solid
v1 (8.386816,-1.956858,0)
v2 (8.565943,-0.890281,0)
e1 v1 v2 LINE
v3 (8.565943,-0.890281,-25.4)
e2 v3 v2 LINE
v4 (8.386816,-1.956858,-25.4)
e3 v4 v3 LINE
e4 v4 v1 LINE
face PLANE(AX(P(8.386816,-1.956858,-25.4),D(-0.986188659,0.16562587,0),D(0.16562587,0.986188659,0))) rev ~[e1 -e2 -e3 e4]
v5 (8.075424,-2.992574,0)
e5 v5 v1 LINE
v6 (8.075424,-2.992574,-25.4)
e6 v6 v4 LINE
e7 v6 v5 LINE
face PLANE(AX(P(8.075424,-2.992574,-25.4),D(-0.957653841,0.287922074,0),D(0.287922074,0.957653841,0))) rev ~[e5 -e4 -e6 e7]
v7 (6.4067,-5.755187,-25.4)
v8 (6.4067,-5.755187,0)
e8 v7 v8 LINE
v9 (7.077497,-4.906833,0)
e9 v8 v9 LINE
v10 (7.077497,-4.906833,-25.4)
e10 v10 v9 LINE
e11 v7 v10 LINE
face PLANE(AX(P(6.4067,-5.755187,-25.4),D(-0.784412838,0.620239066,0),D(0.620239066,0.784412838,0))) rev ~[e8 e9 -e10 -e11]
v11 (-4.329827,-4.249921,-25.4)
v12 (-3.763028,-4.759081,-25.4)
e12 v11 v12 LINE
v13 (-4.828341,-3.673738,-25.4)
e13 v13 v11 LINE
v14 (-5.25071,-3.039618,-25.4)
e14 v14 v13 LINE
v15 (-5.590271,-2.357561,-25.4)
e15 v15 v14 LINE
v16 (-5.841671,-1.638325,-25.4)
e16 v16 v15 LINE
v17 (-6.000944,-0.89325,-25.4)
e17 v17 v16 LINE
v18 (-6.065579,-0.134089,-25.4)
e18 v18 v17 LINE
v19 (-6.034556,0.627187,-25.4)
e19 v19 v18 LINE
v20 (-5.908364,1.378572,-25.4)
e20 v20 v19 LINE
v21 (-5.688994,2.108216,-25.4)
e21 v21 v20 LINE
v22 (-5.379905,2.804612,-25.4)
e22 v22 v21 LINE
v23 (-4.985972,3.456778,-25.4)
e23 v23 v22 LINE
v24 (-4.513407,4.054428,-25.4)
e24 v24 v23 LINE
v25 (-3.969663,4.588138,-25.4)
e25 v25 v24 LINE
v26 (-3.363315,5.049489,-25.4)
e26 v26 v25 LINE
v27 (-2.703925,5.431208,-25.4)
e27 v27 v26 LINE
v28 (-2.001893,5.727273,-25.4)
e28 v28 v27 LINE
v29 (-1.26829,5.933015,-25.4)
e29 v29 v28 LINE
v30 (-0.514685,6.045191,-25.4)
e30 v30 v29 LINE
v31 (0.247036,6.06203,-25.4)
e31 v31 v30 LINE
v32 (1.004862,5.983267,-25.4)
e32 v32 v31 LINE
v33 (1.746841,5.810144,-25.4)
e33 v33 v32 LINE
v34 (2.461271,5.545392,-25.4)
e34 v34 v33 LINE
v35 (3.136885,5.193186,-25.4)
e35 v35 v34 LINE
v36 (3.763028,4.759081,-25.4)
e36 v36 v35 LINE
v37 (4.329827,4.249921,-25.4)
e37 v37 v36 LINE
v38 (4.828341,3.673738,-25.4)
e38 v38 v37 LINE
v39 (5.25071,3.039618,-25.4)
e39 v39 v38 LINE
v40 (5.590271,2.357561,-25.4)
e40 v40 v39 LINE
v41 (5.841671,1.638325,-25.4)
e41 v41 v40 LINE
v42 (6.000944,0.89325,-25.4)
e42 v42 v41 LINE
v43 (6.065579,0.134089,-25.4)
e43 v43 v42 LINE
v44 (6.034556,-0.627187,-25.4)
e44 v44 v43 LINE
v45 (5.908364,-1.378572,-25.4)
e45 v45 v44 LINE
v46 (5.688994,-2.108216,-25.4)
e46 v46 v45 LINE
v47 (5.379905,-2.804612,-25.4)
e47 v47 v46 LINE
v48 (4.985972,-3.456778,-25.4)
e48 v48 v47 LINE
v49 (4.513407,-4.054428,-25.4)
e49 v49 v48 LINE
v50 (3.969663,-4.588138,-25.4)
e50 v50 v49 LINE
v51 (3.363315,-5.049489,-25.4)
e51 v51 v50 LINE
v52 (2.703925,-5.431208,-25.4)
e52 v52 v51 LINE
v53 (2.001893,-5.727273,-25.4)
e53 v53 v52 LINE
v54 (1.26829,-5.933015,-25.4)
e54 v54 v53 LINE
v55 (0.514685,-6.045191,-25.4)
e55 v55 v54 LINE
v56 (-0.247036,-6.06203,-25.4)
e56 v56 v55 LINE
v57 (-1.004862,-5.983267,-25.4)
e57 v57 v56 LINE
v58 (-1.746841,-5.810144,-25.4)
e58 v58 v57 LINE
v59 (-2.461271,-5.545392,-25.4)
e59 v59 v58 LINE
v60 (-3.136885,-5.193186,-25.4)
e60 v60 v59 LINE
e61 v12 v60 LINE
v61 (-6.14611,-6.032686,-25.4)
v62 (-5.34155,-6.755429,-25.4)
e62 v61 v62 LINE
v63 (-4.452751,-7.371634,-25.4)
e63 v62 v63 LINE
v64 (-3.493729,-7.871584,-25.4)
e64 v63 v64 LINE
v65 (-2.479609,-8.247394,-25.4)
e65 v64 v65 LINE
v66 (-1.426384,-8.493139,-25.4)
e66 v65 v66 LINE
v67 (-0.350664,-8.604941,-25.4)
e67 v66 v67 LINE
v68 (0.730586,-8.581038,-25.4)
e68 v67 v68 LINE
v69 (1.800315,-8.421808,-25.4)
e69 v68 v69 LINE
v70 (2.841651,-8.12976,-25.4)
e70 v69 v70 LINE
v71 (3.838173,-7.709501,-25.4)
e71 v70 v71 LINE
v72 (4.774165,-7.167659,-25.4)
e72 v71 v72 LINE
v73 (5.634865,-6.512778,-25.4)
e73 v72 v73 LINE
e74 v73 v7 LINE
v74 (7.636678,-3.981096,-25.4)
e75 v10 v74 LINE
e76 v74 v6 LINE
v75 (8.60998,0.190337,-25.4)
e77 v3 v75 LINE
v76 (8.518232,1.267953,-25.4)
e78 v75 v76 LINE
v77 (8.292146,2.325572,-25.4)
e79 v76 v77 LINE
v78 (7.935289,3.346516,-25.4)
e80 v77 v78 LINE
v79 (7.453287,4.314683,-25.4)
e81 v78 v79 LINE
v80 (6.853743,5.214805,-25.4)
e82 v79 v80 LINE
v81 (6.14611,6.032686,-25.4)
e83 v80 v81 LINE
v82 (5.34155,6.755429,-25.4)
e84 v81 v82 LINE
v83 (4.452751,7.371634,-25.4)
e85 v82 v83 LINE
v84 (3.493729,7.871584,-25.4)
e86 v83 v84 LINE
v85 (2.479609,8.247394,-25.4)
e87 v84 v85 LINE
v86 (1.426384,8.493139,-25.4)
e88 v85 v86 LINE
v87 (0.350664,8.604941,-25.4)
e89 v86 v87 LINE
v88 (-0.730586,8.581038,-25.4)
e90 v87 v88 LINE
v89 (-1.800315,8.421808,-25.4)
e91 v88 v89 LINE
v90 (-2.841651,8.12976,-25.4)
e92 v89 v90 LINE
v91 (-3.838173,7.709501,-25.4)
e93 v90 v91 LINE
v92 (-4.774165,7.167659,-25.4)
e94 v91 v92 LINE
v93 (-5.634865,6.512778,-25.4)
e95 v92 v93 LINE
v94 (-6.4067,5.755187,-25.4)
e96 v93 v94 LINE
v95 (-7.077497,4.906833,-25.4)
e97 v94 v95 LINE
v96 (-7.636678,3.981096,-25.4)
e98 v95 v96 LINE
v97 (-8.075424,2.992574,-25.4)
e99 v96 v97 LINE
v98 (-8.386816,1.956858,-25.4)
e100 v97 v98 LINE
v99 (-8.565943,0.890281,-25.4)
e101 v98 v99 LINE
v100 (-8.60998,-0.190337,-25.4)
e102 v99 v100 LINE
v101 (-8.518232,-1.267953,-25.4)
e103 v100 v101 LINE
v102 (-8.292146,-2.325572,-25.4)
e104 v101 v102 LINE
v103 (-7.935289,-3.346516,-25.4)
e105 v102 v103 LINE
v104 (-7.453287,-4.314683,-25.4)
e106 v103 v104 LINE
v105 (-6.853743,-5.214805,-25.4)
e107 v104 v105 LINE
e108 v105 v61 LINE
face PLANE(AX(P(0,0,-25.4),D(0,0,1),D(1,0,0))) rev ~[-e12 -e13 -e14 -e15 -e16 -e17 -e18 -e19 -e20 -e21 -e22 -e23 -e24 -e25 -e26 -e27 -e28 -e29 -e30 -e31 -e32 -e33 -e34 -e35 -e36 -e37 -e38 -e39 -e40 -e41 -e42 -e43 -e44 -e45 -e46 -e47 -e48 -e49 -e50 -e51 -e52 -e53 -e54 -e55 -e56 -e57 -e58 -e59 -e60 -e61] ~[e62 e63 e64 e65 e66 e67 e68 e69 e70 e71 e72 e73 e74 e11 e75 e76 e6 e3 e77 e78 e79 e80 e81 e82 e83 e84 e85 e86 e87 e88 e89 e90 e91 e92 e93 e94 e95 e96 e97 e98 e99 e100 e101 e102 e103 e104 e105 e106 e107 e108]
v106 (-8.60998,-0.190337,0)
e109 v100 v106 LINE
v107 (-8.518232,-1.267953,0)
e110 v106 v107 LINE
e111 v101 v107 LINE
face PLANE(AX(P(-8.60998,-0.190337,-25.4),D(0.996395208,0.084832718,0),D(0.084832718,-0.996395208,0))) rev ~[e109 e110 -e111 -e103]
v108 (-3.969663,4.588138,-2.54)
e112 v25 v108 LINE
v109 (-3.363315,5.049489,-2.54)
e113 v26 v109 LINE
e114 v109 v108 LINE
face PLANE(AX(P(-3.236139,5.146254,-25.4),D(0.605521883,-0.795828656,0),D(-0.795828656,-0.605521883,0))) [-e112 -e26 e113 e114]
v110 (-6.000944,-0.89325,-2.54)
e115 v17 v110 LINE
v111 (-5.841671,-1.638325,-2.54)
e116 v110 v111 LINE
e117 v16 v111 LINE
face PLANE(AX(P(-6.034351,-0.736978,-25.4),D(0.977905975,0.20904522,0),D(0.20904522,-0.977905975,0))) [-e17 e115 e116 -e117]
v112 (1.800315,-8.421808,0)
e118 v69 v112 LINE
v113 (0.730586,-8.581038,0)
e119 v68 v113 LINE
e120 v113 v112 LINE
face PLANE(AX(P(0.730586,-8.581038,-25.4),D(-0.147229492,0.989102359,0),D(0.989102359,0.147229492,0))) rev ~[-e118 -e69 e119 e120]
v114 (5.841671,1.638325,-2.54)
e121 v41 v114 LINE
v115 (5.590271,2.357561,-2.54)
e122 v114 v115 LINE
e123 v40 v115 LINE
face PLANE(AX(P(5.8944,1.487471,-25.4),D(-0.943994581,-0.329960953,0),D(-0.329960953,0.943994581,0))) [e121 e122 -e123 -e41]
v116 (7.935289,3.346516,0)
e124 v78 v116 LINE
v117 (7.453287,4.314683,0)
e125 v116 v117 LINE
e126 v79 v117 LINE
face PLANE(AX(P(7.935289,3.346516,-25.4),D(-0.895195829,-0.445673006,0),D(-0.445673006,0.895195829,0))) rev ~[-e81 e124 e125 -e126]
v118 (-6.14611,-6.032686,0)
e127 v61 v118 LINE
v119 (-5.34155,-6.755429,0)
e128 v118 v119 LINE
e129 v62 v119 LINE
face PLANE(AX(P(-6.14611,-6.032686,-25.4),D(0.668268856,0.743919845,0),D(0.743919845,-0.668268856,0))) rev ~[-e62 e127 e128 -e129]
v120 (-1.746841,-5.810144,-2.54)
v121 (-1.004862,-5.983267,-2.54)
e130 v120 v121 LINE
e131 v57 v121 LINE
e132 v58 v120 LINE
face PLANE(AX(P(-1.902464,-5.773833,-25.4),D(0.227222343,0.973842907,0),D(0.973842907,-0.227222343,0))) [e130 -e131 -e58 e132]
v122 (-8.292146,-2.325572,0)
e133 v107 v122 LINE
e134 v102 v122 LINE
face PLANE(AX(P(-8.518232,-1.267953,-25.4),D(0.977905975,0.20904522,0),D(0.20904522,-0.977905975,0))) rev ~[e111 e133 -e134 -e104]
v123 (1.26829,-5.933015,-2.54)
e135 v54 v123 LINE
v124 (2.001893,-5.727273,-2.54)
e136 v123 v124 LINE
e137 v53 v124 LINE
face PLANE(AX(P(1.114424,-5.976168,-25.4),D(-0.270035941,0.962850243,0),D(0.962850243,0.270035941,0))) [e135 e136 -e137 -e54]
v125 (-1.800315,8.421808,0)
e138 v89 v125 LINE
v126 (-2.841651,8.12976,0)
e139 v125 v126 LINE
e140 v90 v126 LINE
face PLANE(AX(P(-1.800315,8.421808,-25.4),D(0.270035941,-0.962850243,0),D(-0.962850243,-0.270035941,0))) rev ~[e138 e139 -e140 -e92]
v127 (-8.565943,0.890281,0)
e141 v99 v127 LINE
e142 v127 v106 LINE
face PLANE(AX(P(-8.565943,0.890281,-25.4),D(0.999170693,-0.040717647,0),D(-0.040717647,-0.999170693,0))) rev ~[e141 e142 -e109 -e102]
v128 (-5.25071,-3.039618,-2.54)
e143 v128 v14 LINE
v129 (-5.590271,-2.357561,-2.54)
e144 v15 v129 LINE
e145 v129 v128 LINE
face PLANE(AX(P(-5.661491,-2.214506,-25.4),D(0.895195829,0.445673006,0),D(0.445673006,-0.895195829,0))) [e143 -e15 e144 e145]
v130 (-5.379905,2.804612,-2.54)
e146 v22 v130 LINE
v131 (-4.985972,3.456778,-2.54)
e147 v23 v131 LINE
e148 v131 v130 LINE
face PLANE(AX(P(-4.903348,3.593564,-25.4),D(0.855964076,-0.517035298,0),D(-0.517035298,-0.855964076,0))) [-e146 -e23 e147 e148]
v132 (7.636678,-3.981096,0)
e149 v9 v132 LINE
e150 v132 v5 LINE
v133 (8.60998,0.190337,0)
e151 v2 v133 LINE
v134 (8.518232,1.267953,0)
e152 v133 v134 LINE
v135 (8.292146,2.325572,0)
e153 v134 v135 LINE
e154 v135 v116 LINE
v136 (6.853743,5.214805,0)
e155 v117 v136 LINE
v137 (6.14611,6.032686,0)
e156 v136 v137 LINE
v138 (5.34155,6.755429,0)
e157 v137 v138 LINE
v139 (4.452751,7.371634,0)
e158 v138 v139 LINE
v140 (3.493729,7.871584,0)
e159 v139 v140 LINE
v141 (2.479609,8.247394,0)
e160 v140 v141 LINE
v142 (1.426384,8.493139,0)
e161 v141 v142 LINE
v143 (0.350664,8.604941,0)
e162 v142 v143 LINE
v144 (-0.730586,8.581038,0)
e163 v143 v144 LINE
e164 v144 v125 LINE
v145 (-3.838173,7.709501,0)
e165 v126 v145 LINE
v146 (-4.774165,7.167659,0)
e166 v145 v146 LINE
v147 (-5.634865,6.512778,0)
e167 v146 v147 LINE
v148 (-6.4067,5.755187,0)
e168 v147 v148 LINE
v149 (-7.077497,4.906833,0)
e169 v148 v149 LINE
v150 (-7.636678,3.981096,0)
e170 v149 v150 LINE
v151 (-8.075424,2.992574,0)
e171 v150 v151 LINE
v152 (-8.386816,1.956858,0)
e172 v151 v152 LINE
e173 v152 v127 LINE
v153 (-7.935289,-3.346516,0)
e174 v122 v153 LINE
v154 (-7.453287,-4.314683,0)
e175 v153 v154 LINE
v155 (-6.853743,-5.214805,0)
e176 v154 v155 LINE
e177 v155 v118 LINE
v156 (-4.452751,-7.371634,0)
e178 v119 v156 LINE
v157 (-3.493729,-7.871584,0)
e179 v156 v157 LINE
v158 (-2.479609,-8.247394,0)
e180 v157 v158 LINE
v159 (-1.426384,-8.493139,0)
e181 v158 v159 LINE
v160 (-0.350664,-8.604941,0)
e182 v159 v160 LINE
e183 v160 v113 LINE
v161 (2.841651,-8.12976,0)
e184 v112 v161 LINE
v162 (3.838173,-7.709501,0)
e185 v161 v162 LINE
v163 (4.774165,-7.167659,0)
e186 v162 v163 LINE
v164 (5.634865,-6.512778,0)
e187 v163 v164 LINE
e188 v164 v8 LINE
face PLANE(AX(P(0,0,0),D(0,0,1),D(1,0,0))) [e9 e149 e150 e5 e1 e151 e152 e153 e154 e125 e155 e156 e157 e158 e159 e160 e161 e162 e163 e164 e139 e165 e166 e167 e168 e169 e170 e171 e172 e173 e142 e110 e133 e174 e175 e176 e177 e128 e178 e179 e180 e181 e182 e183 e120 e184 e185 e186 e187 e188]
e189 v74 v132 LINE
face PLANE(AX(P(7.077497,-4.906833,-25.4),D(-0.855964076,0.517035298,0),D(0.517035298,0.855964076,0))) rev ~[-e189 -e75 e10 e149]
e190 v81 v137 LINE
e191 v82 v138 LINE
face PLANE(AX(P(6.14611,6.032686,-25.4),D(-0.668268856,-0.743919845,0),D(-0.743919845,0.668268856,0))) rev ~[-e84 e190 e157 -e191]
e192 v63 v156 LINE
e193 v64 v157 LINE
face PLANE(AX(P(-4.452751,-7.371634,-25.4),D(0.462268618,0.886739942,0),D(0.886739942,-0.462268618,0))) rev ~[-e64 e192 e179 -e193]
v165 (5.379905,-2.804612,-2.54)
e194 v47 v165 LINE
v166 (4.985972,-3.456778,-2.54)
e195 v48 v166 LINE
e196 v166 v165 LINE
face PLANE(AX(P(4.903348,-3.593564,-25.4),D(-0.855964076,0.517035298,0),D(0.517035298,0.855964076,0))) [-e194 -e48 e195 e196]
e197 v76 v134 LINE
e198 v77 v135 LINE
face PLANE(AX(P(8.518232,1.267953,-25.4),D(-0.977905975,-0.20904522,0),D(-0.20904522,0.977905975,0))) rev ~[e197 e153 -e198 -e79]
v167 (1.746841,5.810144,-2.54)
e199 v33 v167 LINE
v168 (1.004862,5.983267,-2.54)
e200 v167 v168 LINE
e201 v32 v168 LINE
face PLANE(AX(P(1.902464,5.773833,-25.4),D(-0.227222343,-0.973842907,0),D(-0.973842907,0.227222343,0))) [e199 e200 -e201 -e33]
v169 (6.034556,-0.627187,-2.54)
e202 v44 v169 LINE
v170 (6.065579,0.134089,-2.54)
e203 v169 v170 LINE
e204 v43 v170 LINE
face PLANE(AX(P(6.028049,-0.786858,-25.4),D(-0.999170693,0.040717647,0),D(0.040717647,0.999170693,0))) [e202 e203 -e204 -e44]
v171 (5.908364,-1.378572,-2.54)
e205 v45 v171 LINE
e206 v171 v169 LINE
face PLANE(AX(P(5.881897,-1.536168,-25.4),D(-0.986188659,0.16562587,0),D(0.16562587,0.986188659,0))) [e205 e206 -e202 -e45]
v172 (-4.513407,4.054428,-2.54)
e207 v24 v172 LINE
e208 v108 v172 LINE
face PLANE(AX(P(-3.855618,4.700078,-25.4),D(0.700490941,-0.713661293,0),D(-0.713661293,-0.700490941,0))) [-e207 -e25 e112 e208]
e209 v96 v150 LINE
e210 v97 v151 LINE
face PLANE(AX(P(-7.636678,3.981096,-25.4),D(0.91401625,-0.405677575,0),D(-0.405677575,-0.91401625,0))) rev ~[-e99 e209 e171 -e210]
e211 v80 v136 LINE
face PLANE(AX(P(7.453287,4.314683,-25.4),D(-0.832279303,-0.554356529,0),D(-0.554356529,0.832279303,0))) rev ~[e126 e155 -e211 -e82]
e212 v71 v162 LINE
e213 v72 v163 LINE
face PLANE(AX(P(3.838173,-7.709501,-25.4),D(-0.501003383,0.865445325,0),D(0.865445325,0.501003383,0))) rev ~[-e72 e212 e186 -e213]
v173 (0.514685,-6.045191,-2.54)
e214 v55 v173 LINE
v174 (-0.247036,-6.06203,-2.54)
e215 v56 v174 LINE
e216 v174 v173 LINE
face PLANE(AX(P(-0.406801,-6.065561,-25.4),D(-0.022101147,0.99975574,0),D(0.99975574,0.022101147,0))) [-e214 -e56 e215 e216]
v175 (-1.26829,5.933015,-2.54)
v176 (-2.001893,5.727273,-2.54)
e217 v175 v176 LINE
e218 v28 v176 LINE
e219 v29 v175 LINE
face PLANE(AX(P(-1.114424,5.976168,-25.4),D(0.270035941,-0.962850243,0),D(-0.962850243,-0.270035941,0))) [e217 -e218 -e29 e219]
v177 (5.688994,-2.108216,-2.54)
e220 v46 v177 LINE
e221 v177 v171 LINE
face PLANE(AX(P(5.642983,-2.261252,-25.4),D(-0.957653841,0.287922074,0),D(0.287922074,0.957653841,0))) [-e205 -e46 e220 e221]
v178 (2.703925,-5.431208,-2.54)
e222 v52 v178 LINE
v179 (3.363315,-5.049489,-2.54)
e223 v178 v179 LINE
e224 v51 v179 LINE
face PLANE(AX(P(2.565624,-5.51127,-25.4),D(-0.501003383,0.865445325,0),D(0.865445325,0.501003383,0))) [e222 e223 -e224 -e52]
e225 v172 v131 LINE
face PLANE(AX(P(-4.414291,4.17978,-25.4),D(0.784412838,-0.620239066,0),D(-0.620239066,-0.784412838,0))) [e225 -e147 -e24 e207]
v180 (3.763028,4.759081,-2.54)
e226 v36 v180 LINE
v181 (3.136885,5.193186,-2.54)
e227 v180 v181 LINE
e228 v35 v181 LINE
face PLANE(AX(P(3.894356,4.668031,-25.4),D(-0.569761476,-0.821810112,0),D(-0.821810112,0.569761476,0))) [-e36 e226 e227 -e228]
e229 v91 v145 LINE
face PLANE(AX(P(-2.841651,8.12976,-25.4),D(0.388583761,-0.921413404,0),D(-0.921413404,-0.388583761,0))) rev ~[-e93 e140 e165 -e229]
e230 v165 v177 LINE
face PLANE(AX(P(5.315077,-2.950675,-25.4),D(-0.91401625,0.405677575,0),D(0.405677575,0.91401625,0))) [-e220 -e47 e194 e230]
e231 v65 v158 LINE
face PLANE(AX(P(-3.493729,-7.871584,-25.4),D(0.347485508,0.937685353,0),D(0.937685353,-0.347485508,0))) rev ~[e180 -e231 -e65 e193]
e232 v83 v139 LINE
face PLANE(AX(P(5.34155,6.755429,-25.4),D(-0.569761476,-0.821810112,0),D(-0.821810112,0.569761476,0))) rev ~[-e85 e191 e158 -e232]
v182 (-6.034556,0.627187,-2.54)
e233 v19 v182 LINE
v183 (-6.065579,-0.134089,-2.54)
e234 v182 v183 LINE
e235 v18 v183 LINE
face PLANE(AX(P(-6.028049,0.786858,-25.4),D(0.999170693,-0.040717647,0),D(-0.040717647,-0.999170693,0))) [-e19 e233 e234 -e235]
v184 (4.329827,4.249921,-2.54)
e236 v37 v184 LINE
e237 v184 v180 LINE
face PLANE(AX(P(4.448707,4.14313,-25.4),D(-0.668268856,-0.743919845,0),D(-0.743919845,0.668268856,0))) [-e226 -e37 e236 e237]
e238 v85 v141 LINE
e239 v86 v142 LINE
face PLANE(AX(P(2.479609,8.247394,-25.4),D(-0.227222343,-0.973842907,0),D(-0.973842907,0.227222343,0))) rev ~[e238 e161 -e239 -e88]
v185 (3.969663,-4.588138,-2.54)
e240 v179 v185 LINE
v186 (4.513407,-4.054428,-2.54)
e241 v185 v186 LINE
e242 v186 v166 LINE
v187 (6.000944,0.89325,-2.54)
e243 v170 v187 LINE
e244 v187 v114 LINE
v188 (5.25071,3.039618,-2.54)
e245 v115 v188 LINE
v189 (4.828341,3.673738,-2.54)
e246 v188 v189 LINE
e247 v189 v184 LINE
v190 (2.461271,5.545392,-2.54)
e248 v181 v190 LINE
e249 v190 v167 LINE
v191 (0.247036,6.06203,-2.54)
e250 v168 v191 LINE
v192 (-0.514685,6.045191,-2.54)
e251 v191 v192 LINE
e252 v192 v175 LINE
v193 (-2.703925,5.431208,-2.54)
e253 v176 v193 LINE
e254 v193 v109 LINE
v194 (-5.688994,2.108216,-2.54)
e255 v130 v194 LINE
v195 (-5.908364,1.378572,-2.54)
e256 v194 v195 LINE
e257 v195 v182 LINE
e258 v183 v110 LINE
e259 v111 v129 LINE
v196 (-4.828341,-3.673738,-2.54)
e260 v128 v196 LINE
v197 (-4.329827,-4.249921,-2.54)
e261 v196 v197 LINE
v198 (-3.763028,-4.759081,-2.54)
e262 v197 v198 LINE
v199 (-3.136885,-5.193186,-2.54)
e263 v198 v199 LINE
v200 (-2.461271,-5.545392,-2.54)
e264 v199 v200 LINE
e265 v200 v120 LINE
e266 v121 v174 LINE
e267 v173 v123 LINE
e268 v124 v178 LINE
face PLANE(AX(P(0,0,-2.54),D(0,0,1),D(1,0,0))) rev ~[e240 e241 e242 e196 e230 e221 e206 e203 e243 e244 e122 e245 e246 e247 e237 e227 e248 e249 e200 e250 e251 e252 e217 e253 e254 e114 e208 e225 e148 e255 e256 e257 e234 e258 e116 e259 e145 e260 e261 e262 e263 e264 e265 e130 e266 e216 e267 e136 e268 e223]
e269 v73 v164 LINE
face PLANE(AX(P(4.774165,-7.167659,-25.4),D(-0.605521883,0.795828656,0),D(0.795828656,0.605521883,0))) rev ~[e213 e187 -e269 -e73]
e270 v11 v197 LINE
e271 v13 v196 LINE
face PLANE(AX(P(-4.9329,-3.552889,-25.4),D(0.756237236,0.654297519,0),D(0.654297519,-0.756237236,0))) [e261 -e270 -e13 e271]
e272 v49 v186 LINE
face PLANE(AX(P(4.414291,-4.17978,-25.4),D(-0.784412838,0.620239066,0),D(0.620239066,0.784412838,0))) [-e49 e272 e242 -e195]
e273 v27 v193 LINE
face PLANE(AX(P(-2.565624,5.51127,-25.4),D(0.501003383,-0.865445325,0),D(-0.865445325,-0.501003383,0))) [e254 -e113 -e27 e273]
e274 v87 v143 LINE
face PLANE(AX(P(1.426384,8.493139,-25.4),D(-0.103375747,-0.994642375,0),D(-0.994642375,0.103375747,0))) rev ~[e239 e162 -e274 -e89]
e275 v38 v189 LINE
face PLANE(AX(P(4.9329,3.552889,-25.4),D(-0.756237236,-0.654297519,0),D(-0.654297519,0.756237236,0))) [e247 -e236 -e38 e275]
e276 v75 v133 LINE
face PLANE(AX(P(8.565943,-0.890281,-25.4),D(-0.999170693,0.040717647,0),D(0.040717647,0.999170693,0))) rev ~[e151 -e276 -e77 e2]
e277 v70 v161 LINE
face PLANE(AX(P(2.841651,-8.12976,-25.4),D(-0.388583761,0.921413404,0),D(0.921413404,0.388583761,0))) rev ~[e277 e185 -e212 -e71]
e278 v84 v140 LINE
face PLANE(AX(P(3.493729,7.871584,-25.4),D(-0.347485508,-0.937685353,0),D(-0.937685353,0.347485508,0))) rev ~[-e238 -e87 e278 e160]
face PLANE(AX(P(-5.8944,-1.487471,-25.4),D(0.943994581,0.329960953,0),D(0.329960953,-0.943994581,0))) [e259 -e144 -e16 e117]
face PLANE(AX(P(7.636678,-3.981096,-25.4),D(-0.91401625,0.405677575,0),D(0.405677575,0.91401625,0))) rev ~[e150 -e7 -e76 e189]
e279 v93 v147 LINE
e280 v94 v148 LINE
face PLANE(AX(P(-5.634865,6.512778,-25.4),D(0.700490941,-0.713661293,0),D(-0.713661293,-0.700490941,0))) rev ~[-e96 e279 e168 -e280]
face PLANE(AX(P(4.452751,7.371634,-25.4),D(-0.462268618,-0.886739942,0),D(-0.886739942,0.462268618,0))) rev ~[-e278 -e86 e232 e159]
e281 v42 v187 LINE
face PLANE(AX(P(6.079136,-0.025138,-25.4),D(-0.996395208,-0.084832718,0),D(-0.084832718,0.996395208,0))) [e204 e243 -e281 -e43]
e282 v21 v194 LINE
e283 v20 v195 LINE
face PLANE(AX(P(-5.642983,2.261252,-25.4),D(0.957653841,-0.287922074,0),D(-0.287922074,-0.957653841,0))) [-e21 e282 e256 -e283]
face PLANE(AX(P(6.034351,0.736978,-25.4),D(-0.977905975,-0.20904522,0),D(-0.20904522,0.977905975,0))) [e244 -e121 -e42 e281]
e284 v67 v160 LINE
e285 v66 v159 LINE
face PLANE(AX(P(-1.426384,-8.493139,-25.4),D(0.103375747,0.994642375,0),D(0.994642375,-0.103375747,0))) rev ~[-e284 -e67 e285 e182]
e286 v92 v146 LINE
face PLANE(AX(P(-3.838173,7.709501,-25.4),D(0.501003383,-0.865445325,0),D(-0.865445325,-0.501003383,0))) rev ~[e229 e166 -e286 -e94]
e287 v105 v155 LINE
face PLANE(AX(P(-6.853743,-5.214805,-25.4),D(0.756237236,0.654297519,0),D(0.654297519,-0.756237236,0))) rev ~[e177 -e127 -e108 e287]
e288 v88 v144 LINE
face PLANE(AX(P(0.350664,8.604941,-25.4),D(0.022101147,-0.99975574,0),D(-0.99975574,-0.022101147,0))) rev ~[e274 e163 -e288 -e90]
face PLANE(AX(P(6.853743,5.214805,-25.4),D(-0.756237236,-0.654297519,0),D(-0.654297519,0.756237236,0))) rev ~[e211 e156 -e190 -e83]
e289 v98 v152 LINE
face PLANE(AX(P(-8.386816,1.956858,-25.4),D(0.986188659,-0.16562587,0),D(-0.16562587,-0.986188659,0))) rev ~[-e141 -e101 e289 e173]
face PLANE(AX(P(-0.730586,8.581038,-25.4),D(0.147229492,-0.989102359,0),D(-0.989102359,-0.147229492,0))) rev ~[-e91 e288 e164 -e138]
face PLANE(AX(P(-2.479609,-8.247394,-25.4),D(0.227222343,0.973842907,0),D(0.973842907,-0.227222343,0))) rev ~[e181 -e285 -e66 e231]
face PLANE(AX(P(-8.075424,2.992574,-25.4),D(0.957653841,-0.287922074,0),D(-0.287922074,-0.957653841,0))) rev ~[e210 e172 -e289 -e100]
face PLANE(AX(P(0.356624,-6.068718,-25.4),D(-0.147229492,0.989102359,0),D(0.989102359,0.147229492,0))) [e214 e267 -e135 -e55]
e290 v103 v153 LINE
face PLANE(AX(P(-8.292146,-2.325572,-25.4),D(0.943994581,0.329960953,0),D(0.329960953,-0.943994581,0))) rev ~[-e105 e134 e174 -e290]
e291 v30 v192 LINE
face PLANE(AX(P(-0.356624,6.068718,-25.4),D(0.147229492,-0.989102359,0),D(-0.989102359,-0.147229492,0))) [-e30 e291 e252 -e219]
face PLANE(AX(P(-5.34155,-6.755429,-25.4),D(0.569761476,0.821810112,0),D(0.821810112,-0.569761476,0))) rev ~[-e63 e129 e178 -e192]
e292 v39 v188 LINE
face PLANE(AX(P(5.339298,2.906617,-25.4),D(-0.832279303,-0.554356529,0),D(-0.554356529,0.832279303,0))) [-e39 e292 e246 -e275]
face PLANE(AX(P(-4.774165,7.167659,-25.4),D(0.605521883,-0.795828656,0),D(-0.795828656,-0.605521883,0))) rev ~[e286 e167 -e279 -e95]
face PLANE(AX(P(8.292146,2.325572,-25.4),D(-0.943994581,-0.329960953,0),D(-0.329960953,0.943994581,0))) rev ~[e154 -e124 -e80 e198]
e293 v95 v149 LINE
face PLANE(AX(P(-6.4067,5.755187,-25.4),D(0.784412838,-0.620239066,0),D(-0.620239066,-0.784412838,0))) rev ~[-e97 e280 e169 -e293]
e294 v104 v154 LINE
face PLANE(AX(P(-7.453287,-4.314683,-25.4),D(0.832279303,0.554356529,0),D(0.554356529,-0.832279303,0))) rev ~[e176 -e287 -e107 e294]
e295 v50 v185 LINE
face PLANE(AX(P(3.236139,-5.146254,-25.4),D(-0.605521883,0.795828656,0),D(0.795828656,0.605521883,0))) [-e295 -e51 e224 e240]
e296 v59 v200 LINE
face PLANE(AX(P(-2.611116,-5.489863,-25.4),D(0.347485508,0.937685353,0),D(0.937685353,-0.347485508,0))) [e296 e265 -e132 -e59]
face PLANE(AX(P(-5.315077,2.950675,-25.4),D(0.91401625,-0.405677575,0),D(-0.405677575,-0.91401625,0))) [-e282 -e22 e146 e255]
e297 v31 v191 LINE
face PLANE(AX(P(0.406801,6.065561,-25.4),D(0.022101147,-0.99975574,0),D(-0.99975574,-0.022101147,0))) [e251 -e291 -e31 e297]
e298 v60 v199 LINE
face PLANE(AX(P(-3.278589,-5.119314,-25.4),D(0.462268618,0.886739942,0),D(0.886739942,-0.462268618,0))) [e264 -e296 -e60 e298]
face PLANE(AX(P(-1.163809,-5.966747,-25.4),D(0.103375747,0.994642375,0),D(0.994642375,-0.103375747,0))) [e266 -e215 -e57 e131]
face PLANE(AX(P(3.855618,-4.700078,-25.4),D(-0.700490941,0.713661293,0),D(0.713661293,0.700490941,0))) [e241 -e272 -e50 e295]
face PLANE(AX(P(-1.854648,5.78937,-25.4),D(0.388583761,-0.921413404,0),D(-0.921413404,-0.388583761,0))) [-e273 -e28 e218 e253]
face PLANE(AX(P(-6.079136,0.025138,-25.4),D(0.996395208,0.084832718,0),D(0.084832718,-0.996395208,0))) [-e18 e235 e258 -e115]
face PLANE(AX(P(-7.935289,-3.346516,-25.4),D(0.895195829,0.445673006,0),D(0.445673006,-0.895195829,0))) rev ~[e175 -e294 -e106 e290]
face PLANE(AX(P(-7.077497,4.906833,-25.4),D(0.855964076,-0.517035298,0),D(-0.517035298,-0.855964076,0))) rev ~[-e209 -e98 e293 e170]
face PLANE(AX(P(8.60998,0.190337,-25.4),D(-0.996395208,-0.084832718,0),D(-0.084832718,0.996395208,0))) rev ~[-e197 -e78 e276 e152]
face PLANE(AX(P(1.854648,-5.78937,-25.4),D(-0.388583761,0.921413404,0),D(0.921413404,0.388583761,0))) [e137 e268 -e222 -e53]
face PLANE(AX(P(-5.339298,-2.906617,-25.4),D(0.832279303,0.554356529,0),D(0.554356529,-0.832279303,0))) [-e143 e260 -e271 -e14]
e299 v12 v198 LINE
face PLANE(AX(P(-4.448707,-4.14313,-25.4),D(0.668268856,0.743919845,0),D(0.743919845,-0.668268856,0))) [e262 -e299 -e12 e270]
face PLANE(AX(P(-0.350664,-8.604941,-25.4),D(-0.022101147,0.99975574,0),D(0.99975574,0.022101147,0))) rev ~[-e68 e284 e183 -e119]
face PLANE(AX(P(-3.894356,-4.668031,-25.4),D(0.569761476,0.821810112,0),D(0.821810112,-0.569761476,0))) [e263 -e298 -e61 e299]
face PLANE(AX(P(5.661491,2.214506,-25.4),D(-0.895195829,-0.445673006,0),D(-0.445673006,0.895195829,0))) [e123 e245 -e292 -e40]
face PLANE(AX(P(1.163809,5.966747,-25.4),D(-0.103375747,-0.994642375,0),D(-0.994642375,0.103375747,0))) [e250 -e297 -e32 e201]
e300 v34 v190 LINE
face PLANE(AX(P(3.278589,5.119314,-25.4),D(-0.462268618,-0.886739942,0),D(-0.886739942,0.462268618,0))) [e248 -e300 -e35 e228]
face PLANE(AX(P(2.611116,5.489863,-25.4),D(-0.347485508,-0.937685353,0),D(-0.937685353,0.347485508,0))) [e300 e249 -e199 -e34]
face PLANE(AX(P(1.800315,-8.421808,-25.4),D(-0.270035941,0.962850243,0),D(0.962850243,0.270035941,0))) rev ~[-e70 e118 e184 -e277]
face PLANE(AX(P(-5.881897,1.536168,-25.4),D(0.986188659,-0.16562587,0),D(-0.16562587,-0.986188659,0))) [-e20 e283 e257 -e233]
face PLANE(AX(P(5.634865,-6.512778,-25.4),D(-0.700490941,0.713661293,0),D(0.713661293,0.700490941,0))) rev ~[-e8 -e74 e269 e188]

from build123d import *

# Parameters (mm, degrees)
F1_DEPTH = 25.4
F2_T     = -2.54


with BuildPart() as f1:
    # F0 (on Top) → F1 (new body)
    with BuildSketch(Plane.XY):
        Polygon((-7.453287064, -4.3146827775), (-6.853742525, -5.2148047835), (-6.1461103721, -6.0326862028), (-5.3415503872, -6.755428557), (-4.4527509618, -7.3716337674), (-3.4937289938, -7.8715839096), (-2.4796088325, -8.2473944714), (-1.4263837586, -8.4931386955), (-0.3506637608, -8.6049410489), (0.7305864139, -8.5810383416), (1.8003148046, -8.4218075336), (2.8416511552, -8.1297597898), (3.8381729697, -7.7095008777), (4.7741645036, -7.1676585313), (5.6348646113, -6.5127779281), (6.406699538, -5.7551869264), (7.0774969858, -4.906833189), (7.6366780783, -3.9810957609), (8.0754241955, -2.9925740745), (8.3868160491, -1.9568577072), (8.5659428036, -0.890280525), (8.6099795231, 0.190336913), (8.5182317221, 1.2679526241), (8.2921463183, 2.3255719649), (7.9352888136, 3.3465156466), (7.453287064, 4.3146827775), (6.853742525, 5.2148047835), (6.1461103721, 6.0326862028), (5.3415503872, 6.755428557), (4.4527509618, 7.3716337674), (3.4937289938, 7.8715839096), (2.4796088325, 8.2473944714), (1.4263837586, 8.4931386955), (0.3506637608, 8.6049410489), (-0.7305864139, 8.5810383416), (-1.8003148046, 8.4218075336), (-2.8416511552, 8.1297597898), (-3.8381729697, 7.7095008777), (-4.7741645036, 7.1676585313), (-5.6348646113, 6.5127779281), (-6.406699538, 5.7551869264), (-7.0774969858, 4.906833189), (-7.6366780783, 3.9810957609), (-8.0754241955, 2.9925740745), (-8.3868160491, 1.9568577072), (-8.5659428036, 0.890280525), (-8.6099795231, -0.190336913), (-8.5182317221, -1.2679526241), (-8.2921463183, -2.3255719649), (-7.9352888136, -3.3465156466), align=None)
    extrude(amount=F1_DEPTH)

    # F2
    f2_openings = [f1.faces().sort_by_distance(p)[0] for p in [
        (0, 0, 0),
    ]]
    offset(amount=F2_T, openings=f2_openings)


with BuildPart() as f1_1:
    # F3: moved
    add(f1.part.moved(Location((0, 0, -25.4))))


solid = f1_1.part
